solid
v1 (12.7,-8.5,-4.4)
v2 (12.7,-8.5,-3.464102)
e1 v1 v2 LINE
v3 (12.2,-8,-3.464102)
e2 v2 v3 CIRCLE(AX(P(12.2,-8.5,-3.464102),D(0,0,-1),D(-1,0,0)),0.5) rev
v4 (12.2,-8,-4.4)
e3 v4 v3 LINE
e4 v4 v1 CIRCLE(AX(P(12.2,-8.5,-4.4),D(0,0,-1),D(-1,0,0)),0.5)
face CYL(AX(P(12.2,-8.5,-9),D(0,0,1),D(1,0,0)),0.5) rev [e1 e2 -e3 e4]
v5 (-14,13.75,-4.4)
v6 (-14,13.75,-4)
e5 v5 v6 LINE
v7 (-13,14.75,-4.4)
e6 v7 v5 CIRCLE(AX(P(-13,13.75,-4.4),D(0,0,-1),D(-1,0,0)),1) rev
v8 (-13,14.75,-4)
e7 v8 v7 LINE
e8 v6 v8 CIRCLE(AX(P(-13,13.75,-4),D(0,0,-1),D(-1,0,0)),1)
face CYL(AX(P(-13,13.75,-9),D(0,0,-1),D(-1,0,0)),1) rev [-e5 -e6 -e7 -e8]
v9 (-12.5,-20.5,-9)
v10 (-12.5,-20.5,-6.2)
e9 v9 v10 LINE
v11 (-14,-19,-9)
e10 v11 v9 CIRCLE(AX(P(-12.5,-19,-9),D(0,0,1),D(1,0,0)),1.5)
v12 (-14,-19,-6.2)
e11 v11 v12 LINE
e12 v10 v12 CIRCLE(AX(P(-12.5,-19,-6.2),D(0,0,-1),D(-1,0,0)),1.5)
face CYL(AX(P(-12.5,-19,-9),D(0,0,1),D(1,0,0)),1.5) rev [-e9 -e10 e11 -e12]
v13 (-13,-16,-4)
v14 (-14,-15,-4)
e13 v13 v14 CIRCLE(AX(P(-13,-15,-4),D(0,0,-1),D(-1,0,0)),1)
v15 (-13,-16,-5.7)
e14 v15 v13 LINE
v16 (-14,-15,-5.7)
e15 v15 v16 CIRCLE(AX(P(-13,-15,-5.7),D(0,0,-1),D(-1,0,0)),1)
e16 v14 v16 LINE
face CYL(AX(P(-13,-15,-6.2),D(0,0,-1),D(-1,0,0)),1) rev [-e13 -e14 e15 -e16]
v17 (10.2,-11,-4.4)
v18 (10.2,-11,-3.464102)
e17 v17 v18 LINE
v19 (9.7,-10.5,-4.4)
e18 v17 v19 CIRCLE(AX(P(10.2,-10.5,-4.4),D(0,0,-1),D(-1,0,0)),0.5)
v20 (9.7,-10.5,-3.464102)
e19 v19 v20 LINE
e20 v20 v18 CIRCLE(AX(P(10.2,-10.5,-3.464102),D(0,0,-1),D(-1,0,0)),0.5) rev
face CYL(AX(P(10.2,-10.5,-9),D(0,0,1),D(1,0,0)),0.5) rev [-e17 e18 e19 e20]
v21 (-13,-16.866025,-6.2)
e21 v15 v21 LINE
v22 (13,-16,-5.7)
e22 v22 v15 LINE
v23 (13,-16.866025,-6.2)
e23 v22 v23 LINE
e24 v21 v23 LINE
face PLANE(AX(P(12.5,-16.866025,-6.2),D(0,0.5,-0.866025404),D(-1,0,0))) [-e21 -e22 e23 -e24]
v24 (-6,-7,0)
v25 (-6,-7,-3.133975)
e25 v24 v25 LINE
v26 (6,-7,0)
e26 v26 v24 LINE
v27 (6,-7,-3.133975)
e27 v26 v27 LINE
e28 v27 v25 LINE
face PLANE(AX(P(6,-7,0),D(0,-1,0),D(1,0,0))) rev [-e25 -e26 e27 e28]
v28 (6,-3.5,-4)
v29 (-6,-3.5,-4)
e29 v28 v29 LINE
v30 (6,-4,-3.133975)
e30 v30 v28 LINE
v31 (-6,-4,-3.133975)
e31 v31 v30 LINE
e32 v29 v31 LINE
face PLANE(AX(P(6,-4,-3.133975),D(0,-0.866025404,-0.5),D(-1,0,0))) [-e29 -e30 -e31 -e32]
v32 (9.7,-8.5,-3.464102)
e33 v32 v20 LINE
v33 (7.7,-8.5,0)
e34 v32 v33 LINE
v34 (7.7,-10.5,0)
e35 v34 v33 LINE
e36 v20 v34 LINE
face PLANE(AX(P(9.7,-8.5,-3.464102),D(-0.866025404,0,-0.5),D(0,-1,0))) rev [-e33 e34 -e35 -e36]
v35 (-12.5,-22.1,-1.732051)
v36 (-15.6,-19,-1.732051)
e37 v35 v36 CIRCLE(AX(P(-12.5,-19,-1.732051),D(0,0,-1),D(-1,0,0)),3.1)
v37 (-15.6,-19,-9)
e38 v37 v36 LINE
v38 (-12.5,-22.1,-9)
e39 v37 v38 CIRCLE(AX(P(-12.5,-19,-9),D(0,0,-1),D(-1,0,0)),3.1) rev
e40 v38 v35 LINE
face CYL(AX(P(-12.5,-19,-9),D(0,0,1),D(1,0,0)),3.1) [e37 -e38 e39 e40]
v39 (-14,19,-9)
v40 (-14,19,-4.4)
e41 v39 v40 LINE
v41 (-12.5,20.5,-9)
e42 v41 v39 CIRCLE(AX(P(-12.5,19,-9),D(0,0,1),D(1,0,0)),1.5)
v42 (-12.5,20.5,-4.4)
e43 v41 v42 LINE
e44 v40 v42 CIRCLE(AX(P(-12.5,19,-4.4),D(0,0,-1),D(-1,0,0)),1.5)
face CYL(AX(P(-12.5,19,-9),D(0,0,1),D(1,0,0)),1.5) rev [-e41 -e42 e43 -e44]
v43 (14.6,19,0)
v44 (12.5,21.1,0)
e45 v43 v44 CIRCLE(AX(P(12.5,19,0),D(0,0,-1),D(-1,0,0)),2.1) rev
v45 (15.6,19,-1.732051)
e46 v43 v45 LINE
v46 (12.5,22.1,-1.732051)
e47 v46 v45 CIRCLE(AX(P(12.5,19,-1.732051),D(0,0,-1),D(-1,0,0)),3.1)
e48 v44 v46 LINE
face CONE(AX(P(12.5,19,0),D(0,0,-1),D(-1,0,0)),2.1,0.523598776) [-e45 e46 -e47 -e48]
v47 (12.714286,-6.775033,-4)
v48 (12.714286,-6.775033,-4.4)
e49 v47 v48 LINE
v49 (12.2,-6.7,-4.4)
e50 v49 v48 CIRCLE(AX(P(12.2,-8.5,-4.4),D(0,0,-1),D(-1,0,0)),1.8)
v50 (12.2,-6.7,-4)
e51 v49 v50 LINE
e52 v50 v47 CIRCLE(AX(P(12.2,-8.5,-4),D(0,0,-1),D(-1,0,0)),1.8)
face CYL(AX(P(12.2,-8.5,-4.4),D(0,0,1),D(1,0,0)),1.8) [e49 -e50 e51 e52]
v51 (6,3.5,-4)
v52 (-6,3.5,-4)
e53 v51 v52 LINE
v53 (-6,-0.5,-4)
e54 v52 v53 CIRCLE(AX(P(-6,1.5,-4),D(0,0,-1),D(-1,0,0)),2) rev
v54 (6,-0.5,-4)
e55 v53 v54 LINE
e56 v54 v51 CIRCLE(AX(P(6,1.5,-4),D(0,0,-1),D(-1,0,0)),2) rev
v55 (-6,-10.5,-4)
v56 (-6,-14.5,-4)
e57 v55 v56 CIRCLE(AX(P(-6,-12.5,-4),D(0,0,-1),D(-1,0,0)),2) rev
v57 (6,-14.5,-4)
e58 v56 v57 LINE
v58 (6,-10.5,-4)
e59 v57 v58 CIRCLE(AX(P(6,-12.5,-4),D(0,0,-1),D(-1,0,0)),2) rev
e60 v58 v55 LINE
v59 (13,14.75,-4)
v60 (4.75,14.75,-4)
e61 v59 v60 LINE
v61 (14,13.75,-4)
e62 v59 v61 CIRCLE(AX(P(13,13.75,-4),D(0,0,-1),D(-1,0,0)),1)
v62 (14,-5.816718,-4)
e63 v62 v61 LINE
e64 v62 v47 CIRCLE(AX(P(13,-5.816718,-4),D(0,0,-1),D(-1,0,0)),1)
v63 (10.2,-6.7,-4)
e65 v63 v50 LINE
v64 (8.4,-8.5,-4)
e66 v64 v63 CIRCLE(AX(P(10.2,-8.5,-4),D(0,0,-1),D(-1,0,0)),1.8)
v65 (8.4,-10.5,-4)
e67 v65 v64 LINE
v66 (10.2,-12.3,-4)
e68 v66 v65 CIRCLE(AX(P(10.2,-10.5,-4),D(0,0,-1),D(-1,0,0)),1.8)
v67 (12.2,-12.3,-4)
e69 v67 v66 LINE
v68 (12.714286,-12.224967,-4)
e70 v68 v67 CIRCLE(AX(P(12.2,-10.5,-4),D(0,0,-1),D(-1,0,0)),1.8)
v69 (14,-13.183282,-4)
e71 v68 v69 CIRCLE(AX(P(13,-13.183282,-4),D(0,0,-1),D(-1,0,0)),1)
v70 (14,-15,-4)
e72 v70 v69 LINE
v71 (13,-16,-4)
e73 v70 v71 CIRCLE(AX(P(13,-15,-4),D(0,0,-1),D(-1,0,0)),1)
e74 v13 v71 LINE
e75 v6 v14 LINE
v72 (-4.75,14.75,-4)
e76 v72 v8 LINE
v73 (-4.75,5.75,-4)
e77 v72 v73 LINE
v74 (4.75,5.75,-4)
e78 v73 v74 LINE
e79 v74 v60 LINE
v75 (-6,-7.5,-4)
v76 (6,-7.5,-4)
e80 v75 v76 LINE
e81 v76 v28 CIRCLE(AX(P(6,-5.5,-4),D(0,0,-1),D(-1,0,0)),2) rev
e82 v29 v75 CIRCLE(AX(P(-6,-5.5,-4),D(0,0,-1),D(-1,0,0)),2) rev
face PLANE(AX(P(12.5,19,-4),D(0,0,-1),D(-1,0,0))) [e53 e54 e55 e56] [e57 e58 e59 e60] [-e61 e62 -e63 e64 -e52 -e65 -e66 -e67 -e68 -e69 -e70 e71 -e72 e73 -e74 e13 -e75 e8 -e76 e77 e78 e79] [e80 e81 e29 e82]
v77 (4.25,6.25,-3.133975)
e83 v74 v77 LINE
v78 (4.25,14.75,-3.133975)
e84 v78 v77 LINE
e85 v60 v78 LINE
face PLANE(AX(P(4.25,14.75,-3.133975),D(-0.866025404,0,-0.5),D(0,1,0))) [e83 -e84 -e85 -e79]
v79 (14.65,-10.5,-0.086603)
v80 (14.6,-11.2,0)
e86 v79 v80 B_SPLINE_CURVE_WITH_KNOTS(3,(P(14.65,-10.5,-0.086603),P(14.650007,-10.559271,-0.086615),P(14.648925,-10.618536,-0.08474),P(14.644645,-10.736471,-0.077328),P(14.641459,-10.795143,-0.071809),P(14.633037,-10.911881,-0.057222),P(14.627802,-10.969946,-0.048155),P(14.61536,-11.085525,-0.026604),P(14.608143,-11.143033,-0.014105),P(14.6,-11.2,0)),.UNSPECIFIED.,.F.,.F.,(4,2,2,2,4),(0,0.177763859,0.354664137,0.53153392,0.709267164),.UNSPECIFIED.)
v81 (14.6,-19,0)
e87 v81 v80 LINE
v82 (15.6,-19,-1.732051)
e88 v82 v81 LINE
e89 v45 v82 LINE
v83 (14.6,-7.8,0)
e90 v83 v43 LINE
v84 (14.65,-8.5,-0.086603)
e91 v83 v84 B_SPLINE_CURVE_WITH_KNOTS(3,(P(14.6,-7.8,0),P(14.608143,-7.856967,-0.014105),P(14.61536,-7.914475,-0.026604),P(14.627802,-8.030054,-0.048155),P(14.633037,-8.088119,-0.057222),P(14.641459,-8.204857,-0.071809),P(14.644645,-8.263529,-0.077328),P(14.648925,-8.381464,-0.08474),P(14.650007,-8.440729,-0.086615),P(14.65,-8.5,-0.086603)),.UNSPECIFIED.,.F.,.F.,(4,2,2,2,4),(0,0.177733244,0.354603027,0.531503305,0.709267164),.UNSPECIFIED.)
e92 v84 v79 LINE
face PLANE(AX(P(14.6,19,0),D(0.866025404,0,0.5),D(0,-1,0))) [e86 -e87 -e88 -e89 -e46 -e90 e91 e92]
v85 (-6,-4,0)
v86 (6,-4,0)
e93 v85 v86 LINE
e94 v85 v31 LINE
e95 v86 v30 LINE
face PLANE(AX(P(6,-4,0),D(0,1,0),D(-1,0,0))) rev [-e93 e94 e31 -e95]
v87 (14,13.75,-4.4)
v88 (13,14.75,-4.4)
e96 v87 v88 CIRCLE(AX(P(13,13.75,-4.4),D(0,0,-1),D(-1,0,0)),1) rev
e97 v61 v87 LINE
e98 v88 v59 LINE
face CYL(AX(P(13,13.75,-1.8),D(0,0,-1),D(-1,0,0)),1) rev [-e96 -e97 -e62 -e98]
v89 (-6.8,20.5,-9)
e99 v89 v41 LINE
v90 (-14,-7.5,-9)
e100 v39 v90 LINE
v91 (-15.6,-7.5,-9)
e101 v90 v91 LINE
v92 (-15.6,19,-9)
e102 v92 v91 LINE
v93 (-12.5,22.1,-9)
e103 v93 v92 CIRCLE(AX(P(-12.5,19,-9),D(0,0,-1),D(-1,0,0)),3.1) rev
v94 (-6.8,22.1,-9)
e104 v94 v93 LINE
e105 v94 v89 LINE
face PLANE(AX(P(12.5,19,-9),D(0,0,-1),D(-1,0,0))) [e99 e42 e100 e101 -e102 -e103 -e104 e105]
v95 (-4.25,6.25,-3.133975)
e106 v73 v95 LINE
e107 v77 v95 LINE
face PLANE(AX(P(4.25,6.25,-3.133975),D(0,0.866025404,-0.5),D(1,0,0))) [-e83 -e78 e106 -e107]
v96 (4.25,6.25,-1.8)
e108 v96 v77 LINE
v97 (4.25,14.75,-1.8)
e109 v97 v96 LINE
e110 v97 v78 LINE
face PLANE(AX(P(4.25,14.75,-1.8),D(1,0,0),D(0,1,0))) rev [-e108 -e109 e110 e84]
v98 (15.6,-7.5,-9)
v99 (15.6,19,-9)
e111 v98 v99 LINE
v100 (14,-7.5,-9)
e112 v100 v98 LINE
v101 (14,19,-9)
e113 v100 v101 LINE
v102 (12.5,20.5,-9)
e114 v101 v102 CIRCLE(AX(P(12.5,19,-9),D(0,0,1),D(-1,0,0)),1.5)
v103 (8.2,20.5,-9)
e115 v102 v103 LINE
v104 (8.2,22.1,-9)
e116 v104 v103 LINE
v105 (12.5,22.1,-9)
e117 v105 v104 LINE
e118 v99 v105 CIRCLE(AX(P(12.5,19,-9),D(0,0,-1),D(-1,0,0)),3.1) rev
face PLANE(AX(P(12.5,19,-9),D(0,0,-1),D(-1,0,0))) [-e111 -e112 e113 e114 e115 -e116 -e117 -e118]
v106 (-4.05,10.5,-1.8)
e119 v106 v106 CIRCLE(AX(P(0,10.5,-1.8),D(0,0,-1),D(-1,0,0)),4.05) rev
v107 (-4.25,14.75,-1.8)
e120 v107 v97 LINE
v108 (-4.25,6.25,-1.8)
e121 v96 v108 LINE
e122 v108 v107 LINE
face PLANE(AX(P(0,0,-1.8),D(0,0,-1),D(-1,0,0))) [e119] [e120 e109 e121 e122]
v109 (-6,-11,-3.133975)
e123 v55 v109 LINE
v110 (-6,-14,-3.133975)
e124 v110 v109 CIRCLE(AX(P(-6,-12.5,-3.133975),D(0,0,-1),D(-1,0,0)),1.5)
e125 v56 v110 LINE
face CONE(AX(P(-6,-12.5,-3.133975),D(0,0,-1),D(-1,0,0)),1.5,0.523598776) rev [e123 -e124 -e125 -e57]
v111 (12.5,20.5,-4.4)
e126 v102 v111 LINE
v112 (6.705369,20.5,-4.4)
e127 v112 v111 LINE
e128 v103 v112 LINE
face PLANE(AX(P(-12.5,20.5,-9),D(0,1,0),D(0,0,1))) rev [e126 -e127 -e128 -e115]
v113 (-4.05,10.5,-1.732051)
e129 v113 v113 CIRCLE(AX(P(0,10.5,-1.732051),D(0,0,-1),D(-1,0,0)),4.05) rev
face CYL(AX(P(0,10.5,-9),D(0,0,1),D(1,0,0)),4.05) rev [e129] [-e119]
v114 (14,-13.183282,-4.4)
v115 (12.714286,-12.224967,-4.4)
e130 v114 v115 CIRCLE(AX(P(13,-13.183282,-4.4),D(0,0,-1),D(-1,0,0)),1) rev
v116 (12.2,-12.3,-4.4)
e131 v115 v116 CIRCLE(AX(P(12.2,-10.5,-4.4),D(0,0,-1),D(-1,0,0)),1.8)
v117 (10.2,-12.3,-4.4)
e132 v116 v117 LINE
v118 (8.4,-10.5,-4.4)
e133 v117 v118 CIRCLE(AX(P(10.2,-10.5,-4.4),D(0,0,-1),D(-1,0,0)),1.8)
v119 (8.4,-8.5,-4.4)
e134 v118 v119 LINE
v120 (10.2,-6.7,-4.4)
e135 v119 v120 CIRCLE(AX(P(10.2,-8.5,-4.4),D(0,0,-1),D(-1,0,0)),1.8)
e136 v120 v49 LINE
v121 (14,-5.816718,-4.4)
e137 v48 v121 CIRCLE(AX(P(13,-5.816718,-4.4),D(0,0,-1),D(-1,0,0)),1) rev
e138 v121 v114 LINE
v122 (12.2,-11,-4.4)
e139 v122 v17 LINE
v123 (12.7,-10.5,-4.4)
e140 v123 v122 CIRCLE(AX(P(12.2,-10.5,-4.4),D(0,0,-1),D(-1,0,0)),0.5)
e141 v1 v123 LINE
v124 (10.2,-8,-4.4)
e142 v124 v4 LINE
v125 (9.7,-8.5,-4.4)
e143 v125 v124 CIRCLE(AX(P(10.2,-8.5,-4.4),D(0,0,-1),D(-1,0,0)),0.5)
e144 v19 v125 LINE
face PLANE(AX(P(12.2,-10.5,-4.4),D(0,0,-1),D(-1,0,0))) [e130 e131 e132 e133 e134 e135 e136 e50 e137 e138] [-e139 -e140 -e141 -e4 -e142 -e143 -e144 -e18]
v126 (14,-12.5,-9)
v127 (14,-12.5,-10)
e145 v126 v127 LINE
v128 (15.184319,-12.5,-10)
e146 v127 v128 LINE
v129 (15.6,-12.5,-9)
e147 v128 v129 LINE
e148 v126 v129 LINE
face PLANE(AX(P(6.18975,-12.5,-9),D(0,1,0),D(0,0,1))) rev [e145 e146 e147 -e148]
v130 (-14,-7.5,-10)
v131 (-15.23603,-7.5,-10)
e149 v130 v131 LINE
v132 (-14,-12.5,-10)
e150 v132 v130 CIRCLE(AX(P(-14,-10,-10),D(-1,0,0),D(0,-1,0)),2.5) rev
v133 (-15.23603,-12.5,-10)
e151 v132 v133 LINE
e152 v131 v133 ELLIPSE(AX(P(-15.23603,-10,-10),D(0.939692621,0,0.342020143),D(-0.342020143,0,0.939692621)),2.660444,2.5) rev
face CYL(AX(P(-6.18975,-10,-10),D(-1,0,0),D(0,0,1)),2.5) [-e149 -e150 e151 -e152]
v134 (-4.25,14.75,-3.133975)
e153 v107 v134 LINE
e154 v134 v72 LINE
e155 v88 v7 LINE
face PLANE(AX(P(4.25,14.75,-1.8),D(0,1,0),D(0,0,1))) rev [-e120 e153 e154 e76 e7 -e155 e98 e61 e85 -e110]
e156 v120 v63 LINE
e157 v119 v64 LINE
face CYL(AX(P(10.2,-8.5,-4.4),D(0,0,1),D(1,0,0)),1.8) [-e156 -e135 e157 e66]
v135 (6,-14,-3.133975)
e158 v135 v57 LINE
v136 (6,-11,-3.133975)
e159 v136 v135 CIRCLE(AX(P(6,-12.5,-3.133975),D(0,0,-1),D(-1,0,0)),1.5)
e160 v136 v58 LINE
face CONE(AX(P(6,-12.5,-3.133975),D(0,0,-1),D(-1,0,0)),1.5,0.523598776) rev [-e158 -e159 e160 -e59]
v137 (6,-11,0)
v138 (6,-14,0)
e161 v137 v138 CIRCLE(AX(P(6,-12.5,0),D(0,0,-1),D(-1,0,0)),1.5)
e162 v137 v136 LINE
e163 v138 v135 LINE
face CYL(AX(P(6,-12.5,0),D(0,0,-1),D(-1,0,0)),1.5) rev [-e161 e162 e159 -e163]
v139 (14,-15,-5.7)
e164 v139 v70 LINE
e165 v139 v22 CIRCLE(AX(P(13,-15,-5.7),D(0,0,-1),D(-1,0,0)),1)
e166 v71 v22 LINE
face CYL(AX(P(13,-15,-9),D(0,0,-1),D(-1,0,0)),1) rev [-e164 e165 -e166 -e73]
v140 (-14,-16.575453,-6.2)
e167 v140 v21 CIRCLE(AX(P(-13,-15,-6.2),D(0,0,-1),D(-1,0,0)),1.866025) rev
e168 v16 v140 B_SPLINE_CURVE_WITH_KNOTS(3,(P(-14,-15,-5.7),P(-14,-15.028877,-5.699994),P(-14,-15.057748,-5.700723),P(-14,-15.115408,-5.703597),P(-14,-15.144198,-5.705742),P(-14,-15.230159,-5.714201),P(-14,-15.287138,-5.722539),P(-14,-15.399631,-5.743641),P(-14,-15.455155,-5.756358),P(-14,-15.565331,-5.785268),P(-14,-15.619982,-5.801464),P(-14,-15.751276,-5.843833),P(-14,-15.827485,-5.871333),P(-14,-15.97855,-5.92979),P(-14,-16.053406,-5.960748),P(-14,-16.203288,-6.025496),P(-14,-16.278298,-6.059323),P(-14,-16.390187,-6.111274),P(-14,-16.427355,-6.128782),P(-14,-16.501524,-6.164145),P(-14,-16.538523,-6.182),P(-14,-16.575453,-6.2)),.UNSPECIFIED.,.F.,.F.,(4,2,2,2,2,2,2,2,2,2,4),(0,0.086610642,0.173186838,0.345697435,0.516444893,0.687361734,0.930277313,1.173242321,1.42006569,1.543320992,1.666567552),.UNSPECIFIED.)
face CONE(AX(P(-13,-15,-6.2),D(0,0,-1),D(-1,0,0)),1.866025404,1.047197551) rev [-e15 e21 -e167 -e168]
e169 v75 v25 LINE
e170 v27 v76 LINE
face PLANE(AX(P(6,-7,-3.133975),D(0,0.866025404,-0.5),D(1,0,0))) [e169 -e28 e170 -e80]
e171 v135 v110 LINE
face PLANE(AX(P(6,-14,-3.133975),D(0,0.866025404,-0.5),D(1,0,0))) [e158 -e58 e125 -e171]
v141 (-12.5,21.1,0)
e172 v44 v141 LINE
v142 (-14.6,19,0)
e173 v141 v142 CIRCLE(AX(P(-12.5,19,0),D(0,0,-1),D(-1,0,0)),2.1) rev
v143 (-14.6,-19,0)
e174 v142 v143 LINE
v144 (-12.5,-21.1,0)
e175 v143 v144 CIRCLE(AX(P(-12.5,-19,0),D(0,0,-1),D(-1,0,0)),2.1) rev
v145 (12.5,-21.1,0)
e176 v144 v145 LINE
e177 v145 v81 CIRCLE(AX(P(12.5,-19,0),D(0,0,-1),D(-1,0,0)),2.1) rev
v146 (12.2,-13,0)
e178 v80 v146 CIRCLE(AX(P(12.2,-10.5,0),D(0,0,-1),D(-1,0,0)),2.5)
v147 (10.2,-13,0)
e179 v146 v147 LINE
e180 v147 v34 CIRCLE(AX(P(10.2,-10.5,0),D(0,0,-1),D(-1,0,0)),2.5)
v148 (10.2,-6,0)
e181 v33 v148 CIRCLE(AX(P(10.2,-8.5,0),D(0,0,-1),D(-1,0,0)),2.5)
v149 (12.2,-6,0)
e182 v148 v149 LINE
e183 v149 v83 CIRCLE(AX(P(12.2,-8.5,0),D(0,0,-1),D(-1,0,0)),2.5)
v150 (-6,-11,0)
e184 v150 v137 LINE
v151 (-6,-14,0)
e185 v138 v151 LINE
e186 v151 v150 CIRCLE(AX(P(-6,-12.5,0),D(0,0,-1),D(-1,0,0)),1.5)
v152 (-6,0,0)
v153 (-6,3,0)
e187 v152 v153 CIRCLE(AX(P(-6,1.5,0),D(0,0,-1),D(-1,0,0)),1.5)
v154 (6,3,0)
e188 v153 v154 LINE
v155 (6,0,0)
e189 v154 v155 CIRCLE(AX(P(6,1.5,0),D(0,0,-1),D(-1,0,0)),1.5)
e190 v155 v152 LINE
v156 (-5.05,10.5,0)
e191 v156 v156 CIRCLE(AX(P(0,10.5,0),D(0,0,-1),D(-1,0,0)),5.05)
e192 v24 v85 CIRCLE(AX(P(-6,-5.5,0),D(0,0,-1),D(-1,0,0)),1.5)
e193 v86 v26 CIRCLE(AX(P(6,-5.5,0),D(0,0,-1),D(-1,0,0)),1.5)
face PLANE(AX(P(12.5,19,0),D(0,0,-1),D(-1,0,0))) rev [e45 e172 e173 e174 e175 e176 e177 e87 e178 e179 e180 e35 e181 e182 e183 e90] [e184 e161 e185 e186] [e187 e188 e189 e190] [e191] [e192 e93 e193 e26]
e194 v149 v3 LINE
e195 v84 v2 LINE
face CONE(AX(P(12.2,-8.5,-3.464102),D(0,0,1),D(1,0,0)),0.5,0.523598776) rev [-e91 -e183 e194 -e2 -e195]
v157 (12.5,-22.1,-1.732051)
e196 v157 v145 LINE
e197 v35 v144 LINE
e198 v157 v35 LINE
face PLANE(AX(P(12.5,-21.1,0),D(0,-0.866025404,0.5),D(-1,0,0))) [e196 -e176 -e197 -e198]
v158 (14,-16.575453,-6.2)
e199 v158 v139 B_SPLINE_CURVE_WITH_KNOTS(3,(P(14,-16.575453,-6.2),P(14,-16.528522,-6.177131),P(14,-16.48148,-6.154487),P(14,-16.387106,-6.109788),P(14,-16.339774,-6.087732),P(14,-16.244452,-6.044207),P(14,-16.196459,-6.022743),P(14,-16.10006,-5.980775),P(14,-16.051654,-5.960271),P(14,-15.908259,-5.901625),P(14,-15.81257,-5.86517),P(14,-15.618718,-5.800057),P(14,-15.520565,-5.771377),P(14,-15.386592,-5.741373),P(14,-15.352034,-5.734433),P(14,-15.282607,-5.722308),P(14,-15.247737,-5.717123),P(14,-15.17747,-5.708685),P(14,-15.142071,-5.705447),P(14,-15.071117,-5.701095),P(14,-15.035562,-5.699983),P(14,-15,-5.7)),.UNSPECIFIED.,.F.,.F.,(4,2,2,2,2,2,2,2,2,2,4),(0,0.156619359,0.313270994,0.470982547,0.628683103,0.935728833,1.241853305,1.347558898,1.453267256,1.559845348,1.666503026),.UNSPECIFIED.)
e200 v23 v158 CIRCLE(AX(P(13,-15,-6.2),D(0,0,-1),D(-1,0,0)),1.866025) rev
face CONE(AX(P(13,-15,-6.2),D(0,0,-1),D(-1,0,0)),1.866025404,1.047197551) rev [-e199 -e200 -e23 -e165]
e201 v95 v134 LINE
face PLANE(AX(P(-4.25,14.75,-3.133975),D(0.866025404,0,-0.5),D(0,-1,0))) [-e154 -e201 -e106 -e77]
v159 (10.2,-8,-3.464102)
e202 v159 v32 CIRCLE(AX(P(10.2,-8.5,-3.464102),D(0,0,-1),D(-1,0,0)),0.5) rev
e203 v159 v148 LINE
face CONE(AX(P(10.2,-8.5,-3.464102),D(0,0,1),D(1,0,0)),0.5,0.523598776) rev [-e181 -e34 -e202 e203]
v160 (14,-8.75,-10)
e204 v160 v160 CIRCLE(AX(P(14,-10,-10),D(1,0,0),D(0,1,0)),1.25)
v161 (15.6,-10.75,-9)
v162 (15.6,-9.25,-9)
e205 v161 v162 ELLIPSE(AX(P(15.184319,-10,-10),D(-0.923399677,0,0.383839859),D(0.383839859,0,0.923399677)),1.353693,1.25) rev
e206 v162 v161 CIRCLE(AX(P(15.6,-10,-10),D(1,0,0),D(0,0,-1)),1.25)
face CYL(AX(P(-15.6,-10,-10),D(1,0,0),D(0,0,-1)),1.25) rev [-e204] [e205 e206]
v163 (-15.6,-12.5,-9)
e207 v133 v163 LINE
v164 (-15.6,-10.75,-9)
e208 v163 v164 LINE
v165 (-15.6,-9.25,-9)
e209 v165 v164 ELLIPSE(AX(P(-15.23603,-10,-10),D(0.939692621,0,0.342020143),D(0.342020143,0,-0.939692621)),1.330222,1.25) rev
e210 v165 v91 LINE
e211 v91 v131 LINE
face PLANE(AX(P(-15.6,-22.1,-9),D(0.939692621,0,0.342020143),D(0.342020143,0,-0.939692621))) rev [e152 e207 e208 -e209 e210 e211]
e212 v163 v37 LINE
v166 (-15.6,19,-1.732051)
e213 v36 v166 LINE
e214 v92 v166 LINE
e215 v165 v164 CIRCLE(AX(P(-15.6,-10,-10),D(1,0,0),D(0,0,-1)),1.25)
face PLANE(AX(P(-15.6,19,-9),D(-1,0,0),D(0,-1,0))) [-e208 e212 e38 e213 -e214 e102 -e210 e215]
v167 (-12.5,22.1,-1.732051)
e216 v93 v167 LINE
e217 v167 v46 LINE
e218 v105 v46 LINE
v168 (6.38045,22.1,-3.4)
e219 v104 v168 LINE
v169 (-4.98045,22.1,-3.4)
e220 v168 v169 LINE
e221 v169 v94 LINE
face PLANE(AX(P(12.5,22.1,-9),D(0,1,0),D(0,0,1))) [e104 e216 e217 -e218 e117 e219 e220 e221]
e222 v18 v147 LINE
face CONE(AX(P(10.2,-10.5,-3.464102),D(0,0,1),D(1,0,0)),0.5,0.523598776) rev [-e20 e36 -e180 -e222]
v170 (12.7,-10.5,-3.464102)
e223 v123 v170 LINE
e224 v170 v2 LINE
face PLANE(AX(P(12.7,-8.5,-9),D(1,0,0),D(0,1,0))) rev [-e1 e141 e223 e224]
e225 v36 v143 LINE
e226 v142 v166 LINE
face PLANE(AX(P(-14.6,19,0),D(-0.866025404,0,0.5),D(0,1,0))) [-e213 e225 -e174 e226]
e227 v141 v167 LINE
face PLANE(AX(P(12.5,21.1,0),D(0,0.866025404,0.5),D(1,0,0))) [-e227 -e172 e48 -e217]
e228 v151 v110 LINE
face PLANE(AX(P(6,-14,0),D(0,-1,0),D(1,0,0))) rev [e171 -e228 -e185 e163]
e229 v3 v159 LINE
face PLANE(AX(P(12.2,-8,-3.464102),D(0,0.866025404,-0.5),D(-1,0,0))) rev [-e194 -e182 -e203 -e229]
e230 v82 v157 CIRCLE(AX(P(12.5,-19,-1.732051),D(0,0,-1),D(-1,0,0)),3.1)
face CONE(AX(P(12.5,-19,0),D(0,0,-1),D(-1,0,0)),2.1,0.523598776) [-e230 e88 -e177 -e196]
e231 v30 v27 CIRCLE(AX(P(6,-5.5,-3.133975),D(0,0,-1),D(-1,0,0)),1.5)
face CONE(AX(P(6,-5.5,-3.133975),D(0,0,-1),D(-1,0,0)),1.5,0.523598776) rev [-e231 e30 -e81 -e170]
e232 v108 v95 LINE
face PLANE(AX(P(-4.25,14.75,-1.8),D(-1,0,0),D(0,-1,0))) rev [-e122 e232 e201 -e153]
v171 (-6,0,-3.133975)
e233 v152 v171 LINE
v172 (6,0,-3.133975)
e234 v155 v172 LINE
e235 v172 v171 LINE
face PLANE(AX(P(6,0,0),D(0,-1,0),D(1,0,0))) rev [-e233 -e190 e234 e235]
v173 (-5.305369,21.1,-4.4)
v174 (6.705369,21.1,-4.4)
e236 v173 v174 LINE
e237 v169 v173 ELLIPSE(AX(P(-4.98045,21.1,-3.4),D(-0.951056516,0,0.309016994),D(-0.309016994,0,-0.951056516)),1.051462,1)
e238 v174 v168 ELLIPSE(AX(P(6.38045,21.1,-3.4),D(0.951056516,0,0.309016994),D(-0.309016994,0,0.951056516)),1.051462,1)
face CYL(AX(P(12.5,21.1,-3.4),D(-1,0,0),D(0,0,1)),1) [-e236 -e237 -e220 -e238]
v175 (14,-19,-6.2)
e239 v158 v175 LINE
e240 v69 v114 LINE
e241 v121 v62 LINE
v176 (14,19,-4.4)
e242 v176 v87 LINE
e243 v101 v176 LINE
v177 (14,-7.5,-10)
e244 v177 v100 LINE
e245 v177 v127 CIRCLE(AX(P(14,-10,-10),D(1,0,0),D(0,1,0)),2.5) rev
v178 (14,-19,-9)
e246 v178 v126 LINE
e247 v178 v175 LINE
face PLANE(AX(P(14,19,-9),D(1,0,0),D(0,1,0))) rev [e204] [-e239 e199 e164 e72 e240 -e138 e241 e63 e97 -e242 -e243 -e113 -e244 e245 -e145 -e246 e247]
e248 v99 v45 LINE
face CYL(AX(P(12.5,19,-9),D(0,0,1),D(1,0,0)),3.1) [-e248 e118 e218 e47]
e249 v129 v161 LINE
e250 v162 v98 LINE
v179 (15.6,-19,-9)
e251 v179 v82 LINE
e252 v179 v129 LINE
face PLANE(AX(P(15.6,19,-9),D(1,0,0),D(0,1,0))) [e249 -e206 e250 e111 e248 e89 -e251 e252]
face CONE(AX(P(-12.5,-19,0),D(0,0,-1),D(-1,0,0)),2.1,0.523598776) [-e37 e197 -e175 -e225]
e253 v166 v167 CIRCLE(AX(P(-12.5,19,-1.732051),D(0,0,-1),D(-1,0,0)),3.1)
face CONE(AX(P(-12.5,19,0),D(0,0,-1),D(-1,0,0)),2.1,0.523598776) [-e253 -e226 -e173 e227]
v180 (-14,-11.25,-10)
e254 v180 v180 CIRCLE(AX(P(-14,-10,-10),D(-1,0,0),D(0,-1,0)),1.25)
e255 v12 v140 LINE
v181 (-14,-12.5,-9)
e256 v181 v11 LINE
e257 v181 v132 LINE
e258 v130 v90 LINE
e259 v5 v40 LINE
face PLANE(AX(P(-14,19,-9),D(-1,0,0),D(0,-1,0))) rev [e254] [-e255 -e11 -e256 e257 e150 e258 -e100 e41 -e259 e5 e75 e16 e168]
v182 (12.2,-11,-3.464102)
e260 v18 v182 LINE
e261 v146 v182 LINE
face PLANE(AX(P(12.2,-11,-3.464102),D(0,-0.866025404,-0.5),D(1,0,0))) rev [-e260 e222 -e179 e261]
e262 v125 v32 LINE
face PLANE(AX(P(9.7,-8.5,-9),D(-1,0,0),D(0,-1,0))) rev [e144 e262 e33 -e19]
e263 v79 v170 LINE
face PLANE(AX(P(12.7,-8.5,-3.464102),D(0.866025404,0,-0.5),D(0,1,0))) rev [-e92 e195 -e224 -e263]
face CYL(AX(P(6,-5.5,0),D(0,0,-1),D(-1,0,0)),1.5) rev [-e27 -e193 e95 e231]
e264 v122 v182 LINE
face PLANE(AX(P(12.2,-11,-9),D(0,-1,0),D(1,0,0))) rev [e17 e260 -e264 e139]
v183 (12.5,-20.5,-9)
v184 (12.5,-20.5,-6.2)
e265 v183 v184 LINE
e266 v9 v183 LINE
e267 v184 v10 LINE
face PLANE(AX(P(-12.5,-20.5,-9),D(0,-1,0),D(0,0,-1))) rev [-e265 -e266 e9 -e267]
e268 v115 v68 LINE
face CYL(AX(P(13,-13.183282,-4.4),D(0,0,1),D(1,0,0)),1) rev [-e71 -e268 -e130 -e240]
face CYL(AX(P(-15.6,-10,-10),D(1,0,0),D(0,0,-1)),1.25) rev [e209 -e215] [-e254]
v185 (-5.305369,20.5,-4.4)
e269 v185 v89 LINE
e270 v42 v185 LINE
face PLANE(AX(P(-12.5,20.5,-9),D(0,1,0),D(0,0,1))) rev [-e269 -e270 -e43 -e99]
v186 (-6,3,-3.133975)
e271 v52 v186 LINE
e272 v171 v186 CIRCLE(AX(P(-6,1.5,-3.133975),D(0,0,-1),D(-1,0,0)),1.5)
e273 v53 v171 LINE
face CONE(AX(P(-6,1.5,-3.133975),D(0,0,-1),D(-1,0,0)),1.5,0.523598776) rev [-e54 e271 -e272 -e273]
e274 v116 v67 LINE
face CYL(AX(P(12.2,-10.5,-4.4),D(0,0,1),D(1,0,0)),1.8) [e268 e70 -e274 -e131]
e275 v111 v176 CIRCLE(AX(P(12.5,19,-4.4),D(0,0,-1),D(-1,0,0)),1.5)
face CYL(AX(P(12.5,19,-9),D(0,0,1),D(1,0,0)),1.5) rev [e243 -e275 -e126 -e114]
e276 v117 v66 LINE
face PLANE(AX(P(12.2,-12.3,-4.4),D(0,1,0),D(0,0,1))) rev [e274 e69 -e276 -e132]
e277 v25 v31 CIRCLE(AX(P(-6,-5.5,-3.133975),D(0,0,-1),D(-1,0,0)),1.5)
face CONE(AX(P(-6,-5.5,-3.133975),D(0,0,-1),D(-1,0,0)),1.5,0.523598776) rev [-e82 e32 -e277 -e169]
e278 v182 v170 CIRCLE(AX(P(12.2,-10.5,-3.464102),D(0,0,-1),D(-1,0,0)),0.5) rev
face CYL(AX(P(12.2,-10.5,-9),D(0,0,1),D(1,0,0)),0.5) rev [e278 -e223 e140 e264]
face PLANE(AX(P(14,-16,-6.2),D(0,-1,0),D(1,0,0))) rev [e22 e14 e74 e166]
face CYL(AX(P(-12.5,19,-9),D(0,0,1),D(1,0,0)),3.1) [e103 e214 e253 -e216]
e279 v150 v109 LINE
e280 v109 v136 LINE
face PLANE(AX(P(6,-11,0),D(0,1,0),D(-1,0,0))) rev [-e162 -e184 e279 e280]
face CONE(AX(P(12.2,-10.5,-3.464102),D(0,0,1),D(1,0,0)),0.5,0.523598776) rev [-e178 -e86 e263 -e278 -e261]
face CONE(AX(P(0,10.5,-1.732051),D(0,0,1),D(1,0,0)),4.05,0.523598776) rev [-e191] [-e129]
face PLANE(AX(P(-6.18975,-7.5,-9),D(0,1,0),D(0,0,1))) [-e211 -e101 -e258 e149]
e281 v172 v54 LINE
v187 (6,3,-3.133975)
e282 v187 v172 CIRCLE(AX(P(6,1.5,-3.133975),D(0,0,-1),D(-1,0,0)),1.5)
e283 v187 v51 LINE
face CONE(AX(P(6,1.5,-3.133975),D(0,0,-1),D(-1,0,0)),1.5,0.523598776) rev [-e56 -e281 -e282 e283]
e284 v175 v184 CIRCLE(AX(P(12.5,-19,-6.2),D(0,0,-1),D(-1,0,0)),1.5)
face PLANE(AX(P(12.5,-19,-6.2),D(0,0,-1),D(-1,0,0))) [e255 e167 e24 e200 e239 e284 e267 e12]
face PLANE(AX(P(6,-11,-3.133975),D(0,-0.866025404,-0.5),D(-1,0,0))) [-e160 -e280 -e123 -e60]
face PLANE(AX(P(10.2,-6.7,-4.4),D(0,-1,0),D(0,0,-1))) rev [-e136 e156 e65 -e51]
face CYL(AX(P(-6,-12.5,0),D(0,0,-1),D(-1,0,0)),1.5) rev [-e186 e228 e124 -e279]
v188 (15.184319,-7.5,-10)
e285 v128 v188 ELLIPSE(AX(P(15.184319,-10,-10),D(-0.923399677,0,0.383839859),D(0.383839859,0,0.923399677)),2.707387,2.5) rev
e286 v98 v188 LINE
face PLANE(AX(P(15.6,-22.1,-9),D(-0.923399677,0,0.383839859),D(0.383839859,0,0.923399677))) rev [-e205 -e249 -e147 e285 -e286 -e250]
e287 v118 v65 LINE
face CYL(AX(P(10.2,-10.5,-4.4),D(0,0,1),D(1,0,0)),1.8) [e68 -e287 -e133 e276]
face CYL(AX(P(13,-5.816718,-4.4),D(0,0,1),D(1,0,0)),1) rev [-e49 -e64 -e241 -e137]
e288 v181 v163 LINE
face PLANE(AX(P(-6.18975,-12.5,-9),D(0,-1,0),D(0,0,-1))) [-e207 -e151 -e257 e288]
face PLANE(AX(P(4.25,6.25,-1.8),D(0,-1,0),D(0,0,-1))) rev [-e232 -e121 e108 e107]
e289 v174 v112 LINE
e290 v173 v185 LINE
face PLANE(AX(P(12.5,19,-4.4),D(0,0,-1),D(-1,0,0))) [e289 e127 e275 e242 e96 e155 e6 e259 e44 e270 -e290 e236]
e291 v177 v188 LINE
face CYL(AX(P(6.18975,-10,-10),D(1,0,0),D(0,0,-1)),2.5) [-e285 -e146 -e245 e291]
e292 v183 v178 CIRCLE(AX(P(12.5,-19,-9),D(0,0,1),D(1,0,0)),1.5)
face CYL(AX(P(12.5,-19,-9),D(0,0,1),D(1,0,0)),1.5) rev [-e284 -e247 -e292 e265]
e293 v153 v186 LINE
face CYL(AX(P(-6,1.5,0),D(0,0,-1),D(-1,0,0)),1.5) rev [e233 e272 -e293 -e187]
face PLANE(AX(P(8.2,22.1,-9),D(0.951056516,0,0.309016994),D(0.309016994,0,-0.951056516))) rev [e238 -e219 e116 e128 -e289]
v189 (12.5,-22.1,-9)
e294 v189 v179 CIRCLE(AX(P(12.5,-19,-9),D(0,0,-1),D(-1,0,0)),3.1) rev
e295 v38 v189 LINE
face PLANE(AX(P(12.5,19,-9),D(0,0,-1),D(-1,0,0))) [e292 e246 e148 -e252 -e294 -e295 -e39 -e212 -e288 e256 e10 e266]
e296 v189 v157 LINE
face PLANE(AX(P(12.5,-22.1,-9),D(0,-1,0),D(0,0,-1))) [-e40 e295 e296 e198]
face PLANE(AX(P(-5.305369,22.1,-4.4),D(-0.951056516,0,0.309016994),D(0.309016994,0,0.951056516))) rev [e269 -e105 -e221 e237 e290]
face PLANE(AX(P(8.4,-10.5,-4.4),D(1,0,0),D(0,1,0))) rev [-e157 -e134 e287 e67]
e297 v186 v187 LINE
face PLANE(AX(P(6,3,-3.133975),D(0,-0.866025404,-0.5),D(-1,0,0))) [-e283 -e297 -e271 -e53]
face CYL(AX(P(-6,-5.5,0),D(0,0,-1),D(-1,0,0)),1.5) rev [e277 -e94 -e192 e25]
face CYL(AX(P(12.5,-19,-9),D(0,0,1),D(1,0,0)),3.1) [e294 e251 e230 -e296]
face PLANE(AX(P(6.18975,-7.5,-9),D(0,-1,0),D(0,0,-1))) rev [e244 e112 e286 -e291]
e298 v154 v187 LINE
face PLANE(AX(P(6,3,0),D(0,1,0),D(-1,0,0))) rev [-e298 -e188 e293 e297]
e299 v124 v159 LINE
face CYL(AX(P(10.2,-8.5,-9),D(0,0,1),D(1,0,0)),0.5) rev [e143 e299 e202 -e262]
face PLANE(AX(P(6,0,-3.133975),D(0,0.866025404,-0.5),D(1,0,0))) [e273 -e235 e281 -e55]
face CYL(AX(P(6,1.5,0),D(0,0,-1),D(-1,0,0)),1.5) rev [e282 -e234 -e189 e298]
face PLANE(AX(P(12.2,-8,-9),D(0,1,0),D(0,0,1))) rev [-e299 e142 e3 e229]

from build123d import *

# Parameters (mm, degrees)
BODY_DEPTH              = 4
SIDEWALLS_DEPTH         = 9
SKETCH2_R               = 4.05
CAMLENS_DEPTH           = 29.509121347
SKETCH3_W               = 8.5
SKETCH3_H               = 8.5
CAMBODY_DEPTH           = 2.2
BOARDSTOPTOP_DEPTH      = 0.4
BOARDSTOPBOTTOM_DEPTH   = 2.2
VENTS_DEPTH             = 28.509452921
FILLET1_START           = -6.2
FILLET1_DEPTH           = 3.2
FILLET1_START_2         = -4.4
FILLET1_2_DEPTH         = 1.4
CHAMFER1_SIZE           = 1
CHAMFER1_SIZE2          = 1.732050808
CHAMFER2_SIZE           = 2
CHAMFER2_SIZE_2         = 3.464101615
CHAMFER3_SIZE           = 0.5
CHAMFER3_SIZE_2         = 0.866025404
CUT_EXTRUDE3_DEPTH      = 47.250621617
FILLET2_R               = 1
ASSYLOCK1_START         = -15.6
ASSYLOCK1_DEPTH         = 1.6
ASSYLOCK2_START         = 14
ASSYLOCK2_DEPTH         = 1.6
CUT_EXTRUDE4_DEPTH      = 30.799664428
CUT_EXTRUDE4_DEPTH_BACK = 30.799664428
SKETCH8_R               = 1.25
CUT_EXTRUDE5_DEPTH      = 30.799664428


with BuildPart() as part:
    # Sketch1 → Body (new body)
    with BuildSketch(Plane.XY):
        with BuildLine():
            Line((-12.5, 20.5), (12.5, 20.5))
            ThreePointArc((12.5, 20.5), (13.560660172, 20.060660172), (14, 19))
            Line((14, 19), (14, -19))
            ThreePointArc((14, -19), (13.560660172, -20.060660172), (12.5, -20.5))
            Line((12.5, -20.5), (-12.5, -20.5))
            ThreePointArc((-12.5, -20.5), (-13.560660172, -20.060660172), (-14, -19))
            Line((-14, -19), (-14, 19))
            ThreePointArc((-14, 19), (-13.560660172, 20.060660172), (-12.5, 20.5))
        make_face()
    extrude(amount=-BODY_DEPTH)

    # Sketch1<2> → SideWalls (add)
    with BuildSketch(Plane.XY):
        with BuildLine():
            Line((12.5, -22.1), (-12.5, -22.1))
            ThreePointArc((-12.5, -22.1), (-14.692031022, -21.192031022), (-15.6, -19))
            Line((-15.6, -19), (-15.6, 19))
            ThreePointArc((-15.6, 19), (-14.692031022, 21.192031022), (-12.5, 22.1))
            Line((-12.5, 22.1), (12.5, 22.1))
            ThreePointArc((12.5, 22.1), (14.692031022, 21.192031022), (15.6, 19))
            Line((15.6, 19), (15.6, -19))
            ThreePointArc((15.6, -19), (14.692031022, -21.192031022), (12.5, -22.1))
        make_face()
        with BuildLine():
            Line((12.5, -20.5), (-12.5, -20.5))
            ThreePointArc((-12.5, -20.5), (-13.560660172, -20.060660172), (-14, -19))
            Line((-14, -19), (-14, 19))
            ThreePointArc((-14, 19), (-13.560660172, 20.060660172), (-12.5, 20.5))
            Line((-12.5, 20.5), (12.5, 20.5))
            ThreePointArc((12.5, 20.5), (13.560660172, 20.060660172), (14, 19))
            Line((14, 19), (14, -19))
            ThreePointArc((14, -19), (13.560660172, -20.060660172), (12.5, -20.5))
        make_face(mode=Mode.SUBTRACT)
    extrude(amount=-SIDEWALLS_DEPTH)

    # Sketch2 → CamLens (cut, through all)
    with BuildSketch(Plane.XY):
        with Locations((0, 10.5)):
            Circle(SKETCH2_R)
        with BuildLine():
            Line((12.2, -8), (10.2, -8))
            ThreePointArc((10.2, -8), (9.846446609, -8.146446609), (9.7, -8.5))
            Line((9.7, -8.5), (9.7, -10.5))
            ThreePointArc((9.7, -10.5), (9.846446609, -10.853553391), (10.2, -11))
            Line((10.2, -11), (12.2, -11))
            ThreePointArc((12.2, -11), (12.553553391, -10.853553391), (12.7, -10.5))
            Line((12.7, -10.5), (12.7, -8.5))
            ThreePointArc((12.7, -8.5), (12.553553391, -8.146446609), (12.2, -8))
        make_face()
    extrude(amount=-CAMLENS_DEPTH, mode=Mode.SUBTRACT)

    # Sketch3 → CamBody (cut)
    with BuildSketch(Plane(origin=(0, 0, -4), x_dir=(-1, 0, 0), z_dir=(0, 0, -1))):
        with Locations((0, 10.5)):
            Rectangle(SKETCH3_W, SKETCH3_H)
    extrude(amount=-CAMBODY_DEPTH, mode=Mode.SUBTRACT)

    # Sketch4 → BoardStopTop (add)
    # profile 1 of 2: a face of its own
    with BuildSketch(Plane(origin=(0, 0, -4), x_dir=(-1, 0, 0), z_dir=(0, 0, -1))):
        with BuildLine():
            Line((-14, 14.75), (-14, 19))
            ThreePointArc((-14, 19), (-13.560660172, 20.060660172), (-12.5, 20.5))
            Line((-12.5, 20.5), (12.5, 20.5))
            ThreePointArc((12.5, 20.5), (13.560660172, 20.060660172), (14, 19))
            Line((14, 19), (14, 14.75))
            Line((14, 14.75), (-14, 14.75))
        make_face()
    # profile 2 of 2: a face of its own
    with BuildSketch(Plane(origin=(0, 0, -4), x_dir=(-1, 0, 0), z_dir=(0, 0, -1))):
        with BuildLine():
            Line((-12.2, -12.3), (-10.2, -12.3))
            ThreePointArc((-10.2, -12.3), (-8.927207794, -11.772792206), (-8.4, -10.5))
            Line((-8.4, -10.5), (-8.4, -8.5))
            ThreePointArc((-8.4, -8.5), (-8.927207794, -7.227207794), (-10.2, -6.7))
            Line((-10.2, -6.7), (-12.2, -6.7))
            ThreePointArc((-12.2, -6.7), (-13.472792206, -7.227207794), (-14, -8.5))
            Line((-14, -8.5), (-14, -10.5))
            ThreePointArc((-14, -10.5), (-13.472792206, -11.772792206), (-12.2, -12.3))
        make_face()
        with BuildLine():
            Line((-12.7, -8.5), (-12.7, -10.5))
            ThreePointArc((-12.7, -10.5), (-12.553553391, -10.853553391), (-12.2, -11))
            Line((-12.2, -11), (-10.2, -11))
            ThreePointArc((-10.2, -11), (-9.846446609, -10.853553391), (-9.7, -10.5))
            Line((-9.7, -10.5), (-9.7, -8.5))
            ThreePointArc((-9.7, -8.5), (-9.846446609, -8.146446609), (-10.2, -8))
            Line((-10.2, -8), (-12.2, -8))
            ThreePointArc((-12.2, -8), (-12.553553391, -8.146446609), (-12.7, -8.5))
        make_face(mode=Mode.SUBTRACT)
    extrude(amount=BOARDSTOPTOP_DEPTH)

    # Sketch5 → BoardStopBottom (add)
    with BuildSketch(Plane(origin=(0, 0, -4), x_dir=(-1, 0, 0), z_dir=(0, 0, -1))):
        with BuildLine():
            Line((12.5, -20.5), (-12.5, -20.5))
            ThreePointArc((-12.5, -20.5), (-13.560660172, -20.060660172), (-14, -19))
            Line((-14, -19), (-14, -16))
            Line((-14, -16), (14, -16))
            Line((14, -16), (14, -19))
            ThreePointArc((14, -19), (13.560660172, -20.060660172), (12.5, -20.5))
        make_face()
    extrude(amount=BOARDSTOPBOTTOM_DEPTH)

    # Sketch10 → Vents (cut, through all)
    with BuildSketch(Plane(origin=(0, 0, -4), x_dir=(-1, 0, 0), z_dir=(0, 0, -1))):
        with BuildLine():
            Line((-6, -4), (6, -4))
            ThreePointArc((6, -4), (7.5, -5.5), (6, -7))
            Line((6, -7), (-6, -7))
            ThreePointArc((-6, -7), (-7.5, -5.5), (-6, -4))
        make_face()
        with BuildLine():
            Line((-6, -11), (6, -11))
            ThreePointArc((6, -11), (7.5, -12.5), (6, -14))
            Line((6, -14), (-6, -14))
            ThreePointArc((-6, -14), (-7.5, -12.5), (-6, -11))
        make_face()
        with BuildLine():
            Line((-6, 3), (6, 3))
            ThreePointArc((6, 3), (7.5, 1.5), (6, 0))
            Line((6, 0), (-6, 0))
            ThreePointArc((-6, 0), (-7.5, 1.5), (-6, 3))
        make_face()
    extrude(amount=-VENTS_DEPTH, mode=Mode.SUBTRACT)

    # Fillet1: read off the stored shape, not the designer's step
    # Fillet1 outline → Fillet1 (add)
    with BuildSketch(Plane.XY.offset(FILLET1_START)):
        with BuildLine():
            Line((-14, -16), (-13, -16))
            ThreePointArc((-13, -16), (-13.707106781, -15.707106781), (-14, -15))
            Line((-14, -15), (-14, -16))
        make_face()
        with BuildLine():
            ThreePointArc((14, -15), (13.707106781, -15.707106781), (13, -16))
            Line((13, -16), (14, -16))
            Line((14, -16), (14, -15))
        make_face()
    extrude(amount=FILLET1_DEPTH)

    # Fillet1 2 outline → Fillet1 2 (add)
    with BuildSketch(Plane.XY.offset(FILLET1_START_2)):
        with BuildLine():
            Line((-14, 14.75), (-14, 13.75))
            ThreePointArc((-14, 13.75), (-13.707106781, 14.457106781), (-13, 14.75))
            Line((-13, 14.75), (-14, 14.75))
        make_face()
        with BuildLine():
            ThreePointArc((12.714285714, -12.224966725), (13.597614305, -12.381497847), (14, -13.183281573))
            Line((14, -13.183281573), (14, -10.5))
            ThreePointArc((14, -10.5), (13.643210706, -11.575705748), (12.714285714, -12.224966725))
        make_face()
        with BuildLine():
            Line((14, 14.75), (13, 14.75))
            ThreePointArc((13, 14.75), (13.707106781, 14.457106781), (14, 13.75))
            Line((14, 13.75), (14, 14.75))
        make_face()
        with BuildLine():
            ThreePointArc((12.714285714, -6.775033275), (13.643210706, -7.424294252), (14, -8.5))
            Line((14, -8.5), (14, -5.816718427))
            ThreePointArc((14, -5.816718427), (13.597614305, -6.618502153), (12.714285714, -6.775033275))
        make_face()
    extrude(amount=FILLET1_2_DEPTH)

    # Chamfer1
    chamfer1_edges = [part.edges().sort_by_distance(p)[0] for p in [
        (14.692031022, 21.192031022, 0),
        (0, 22.1, 0),
        (-14.692031022, 21.192031022, 0),
        (-15.6, 0, 0),
        (-14.692031022, -21.192031022, 0),
        (0, -22.1, 0),
        (14.692031022, -21.192031022, 0),
        (15.6, 0, 0),
        (-4.05, 10.5, 0),
    ]]
    chamfer1_side = [part.faces().sort_by_distance(p)[0] for p in [
        (0, -21.558975047, 0),
    ]]
    chamfer(chamfer1_edges, length=CHAMFER1_SIZE, length2=CHAMFER1_SIZE2, reference=chamfer1_side[0])

    # Chamfer2
    # the kernel refuses this chamfer: 3.464101615, 2 mm, written as the material it takes off along each edge
    with BuildSketch(Plane(origin=(12.2, -10.5, 0), x_dir=(0, -1, 0), z_dir=(-1, 0, 0))) as chamfer2_piece_1:
        Polygon((0.5 + CHAMFER2_SIZE, 0), (0.5, -CHAMFER2_SIZE_2), (0.5, 0), align=None)
    revolve(axis=Axis((12.2, -10.5, 0), (0, 0, 1)), revolution_arc=90, mode=Mode.SUBTRACT)
    with BuildSketch(Plane(origin=(12.7, -10.5, 0), x_dir=(1, 0, 0), z_dir=(0, 1, 0)), Plane(origin=(12.2, -8, 0), x_dir=(0, 1, 0), z_dir=(-1, 0, 0)), Plane(origin=(9.7, -8.5, 0), x_dir=(-1, 0, 0), z_dir=(0, -1, 0)), Plane(origin=(10.2, -11, 0), x_dir=(0, -1, 0), z_dir=(1, 0, 0))) as chamfer2_piece_2:
        Polygon((CHAMFER2_SIZE, 0), (0, CHAMFER2_SIZE_2), (0, 0), align=None)
    extrude(amount=2, mode=Mode.SUBTRACT)
    with BuildSketch(Plane(origin=(12.2, -8.5, 0), x_dir=(1, 0, 0), z_dir=(0, -1, 0))) as chamfer2_piece_3:
        Polygon((0.5 + CHAMFER2_SIZE, 0), (0.5, -CHAMFER2_SIZE_2), (0.5, 0), align=None)
    revolve(axis=Axis((12.2, -8.5, 0), (0, 0, 1)), revolution_arc=90, mode=Mode.SUBTRACT)
    with BuildSketch(Plane(origin=(10.2, -8.5, 0), x_dir=(0, 1, 0), z_dir=(1, 0, 0))) as chamfer2_piece_4:
        Polygon((0.5 + CHAMFER2_SIZE, 0), (0.5, -CHAMFER2_SIZE_2), (0.5, 0), align=None)
    revolve(axis=Axis((10.2, -8.5, 0), (0, 0, 1)), revolution_arc=90, mode=Mode.SUBTRACT)
    with BuildSketch(Plane(origin=(10.2, -10.5, 0), x_dir=(-1, 0, 0), z_dir=(0, 1, 0))) as chamfer2_piece_5:
        Polygon((0.5 + CHAMFER2_SIZE, 0), (0.5, -CHAMFER2_SIZE_2), (0.5, 0), align=None)
    revolve(axis=Axis((10.2, -10.5, 0), (0, 0, 1)), revolution_arc=90, mode=Mode.SUBTRACT)

    # Chamfer3
    # the kernel refuses this chamfer: 0.866025404, 0.5 mm, written as the material it takes off along each edge
    with BuildSketch(Plane(origin=(-4.25, 14.75, -4), x_dir=(-1, 0, 0), z_dir=(0, -1, 0)), Plane(origin=(4.25, 6.25, -4), x_dir=(1, 0, 0), z_dir=(0, 1, 0)), Plane(origin=(-4.25, 6.25, -4), x_dir=(0, -1, 0), z_dir=(1, 0, 0))) as chamfer3_piece_1:
        Polygon((CHAMFER3_SIZE, 0), (0, -CHAMFER3_SIZE_2), (0, 0), align=None)
    extrude(amount=8.5, mode=Mode.SUBTRACT)
    with BuildSketch(Plane(origin=(6, 1.5, -4), x_dir=(0, -1, 0), z_dir=(-1, 0, 0))) as chamfer3_piece_2:
        Polygon((1.5, CHAMFER3_SIZE_2), (1.5 + CHAMFER3_SIZE, 0), (1.5, 0), align=None)
    revolve(axis=Axis((6, 1.5, -4), (0, 0, 1)), revolution_arc=180, mode=Mode.SUBTRACT)
    with BuildSketch(Plane(origin=(-6, 0, -4), x_dir=(0, 0, 1), z_dir=(1, 0, 0)), Plane(origin=(6, 3, -4), x_dir=(0, 0, 1), z_dir=(-1, 0, 0)), Plane(origin=(-6, -14, -4), x_dir=(0, 0, 1), z_dir=(1, 0, 0)), Plane(origin=(6, -11, -4), x_dir=(0, 0, 1), z_dir=(-1, 0, 0)), Plane(origin=(-6, -7, -4), x_dir=(0, 0, 1), z_dir=(1, 0, 0)), Plane(origin=(6, -4, -4), x_dir=(0, 0, 1), z_dir=(-1, 0, 0))) as chamfer3_piece_3:
        Polygon((CHAMFER3_SIZE_2, 0), (0, CHAMFER3_SIZE), (0, 0), align=None)
    extrude(amount=12, mode=Mode.SUBTRACT)
    with BuildSketch(Plane(origin=(-6, 1.5, -4), x_dir=(0, 1, 0), z_dir=(1, 0, 0))) as chamfer3_piece_4:
        Polygon((1.5, CHAMFER3_SIZE_2), (1.5 + CHAMFER3_SIZE, 0), (1.5, 0), align=None)
    revolve(axis=Axis((-6, 1.5, -4), (0, 0, 1)), revolution_arc=180, mode=Mode.SUBTRACT)
    with BuildSketch(Plane(origin=(6, -12.5, -4), x_dir=(0, -1, 0), z_dir=(-1, 0, 0))) as chamfer3_piece_5:
        Polygon((1.5, CHAMFER3_SIZE_2), (1.5 + CHAMFER3_SIZE, 0), (1.5, 0), align=None)
    revolve(axis=Axis((6, -12.5, -4), (0, 0, 1)), revolution_arc=180, mode=Mode.SUBTRACT)
    with BuildSketch(Plane(origin=(-6, -12.5, -4), x_dir=(0, 1, 0), z_dir=(1, 0, 0))) as chamfer3_piece_6:
        Polygon((1.5, CHAMFER3_SIZE_2), (1.5 + CHAMFER3_SIZE, 0), (1.5, 0), align=None)
    revolve(axis=Axis((-6, -12.5, -4), (0, 0, 1)), revolution_arc=180, mode=Mode.SUBTRACT)
    with BuildSketch(Plane(origin=(6, -5.5, -4), x_dir=(0, -1, 0), z_dir=(-1, 0, 0))) as chamfer3_piece_7:
        Polygon((1.5, CHAMFER3_SIZE_2), (1.5 + CHAMFER3_SIZE, 0), (1.5, 0), align=None)
    revolve(axis=Axis((6, -5.5, -4), (0, 0, 1)), revolution_arc=180, mode=Mode.SUBTRACT)
    with BuildSketch(Plane(origin=(-6, -5.5, -4), x_dir=(0, 1, 0), z_dir=(1, 0, 0))) as chamfer3_piece_8:
        Polygon((1.5, CHAMFER3_SIZE_2), (1.5 + CHAMFER3_SIZE, 0), (1.5, 0), align=None)
    revolve(axis=Axis((-6, -5.5, -4), (0, 0, 1)), revolution_arc=180, mode=Mode.SUBTRACT)
    with BuildSketch(Plane(origin=(13, -16, -6.2), x_dir=(0, 0, 1), z_dir=(-1, 0, 0))) as chamfer3_piece_9:
        Polygon((CHAMFER3_SIZE, 0), (0, -CHAMFER3_SIZE_2), (0, 0), align=None)
    extrude(amount=26, mode=Mode.SUBTRACT)
    with BuildSketch(Plane(origin=(-12.999999999, -14.999999999, -6.2), x_dir=(-6.36912744361302e-10, -1.0, 0), z_dir=(1.0, -6.36912744361302e-10, 0))) as chamfer3_piece_10_section:
        Polygon((1.000000001, -CHAMFER3_SIZE), (1.000000001 + CHAMFER3_SIZE_2, 0), (1.000000001, 0), align=None)
    chamfer3_piece_10 = revolve(axis=Axis((-12.999999999, -14.999999999, -6.2), (0, 0, -1)), revolution_arc=218.421729018, mode=Mode.PRIVATE)
    chamfer3_piece_10 = split(chamfer3_piece_10, bisect_by=Plane(origin=(-14, -14.999999999, -6.2), z_dir=(1, 0, 0)), keep=Keep.TOP, mode=Mode.PRIVATE)
    add(chamfer3_piece_10, mode=Mode.SUBTRACT)
    with BuildSketch(Plane(origin=(12.999999999, -14.999999999, -6.2), x_dir=(-0.621444946291684, 0.7834578346845006, 0), z_dir=(-0.7834578346845006, -0.621444946291684, 0))) as chamfer3_piece_11_section:
        Polygon((1.000000001, -CHAMFER3_SIZE), (1.000000001 + CHAMFER3_SIZE_2, 0), (1.000000001, 0), align=None)
    chamfer3_piece_11 = revolve(axis=Axis((12.999999999, -14.999999999, -6.2), (0, 0, -1)), revolution_arc=218.421729018, mode=Mode.PRIVATE)
    chamfer3_piece_11 = split(chamfer3_piece_11, bisect_by=Plane(origin=(14, -14.999999999, -6.2), z_dir=(-1, 0, 0)), keep=Keep.TOP, mode=Mode.PRIVATE)
    add(chamfer3_piece_11, mode=Mode.SUBTRACT)
    with BuildSketch(Plane(origin=(-6.490481985, 6.25, -4), x_dir=(0, -1, 0), z_dir=(1, 0, 0))) as chamfer3_piece_12a_section:
        Polygon((CHAMFER3_SIZE, 0), (0, -CHAMFER3_SIZE_2), (0, 0), align=None)
    chamfer3_piece_12a = extrude(amount=10.740481985, mode=Mode.PRIVATE)
    chamfer3_piece_12a = split(chamfer3_piece_12a, bisect_by=Plane(origin=(-4.25, 6.25, -4), z_dir=(-1, 0, 0)), keep=Keep.TOP, mode=Mode.PRIVATE)
    with BuildSketch(Plane(origin=(-4.25, 14.75, -4), x_dir=(-1, 0, 0), z_dir=(0, -1, 0))) as chamfer3_piece_12b_section:
        Polygon((CHAMFER3_SIZE, 0), (0, -CHAMFER3_SIZE_2), (0, 0), align=None)
    chamfer3_piece_12b = extrude(amount=10.740481985, mode=Mode.PRIVATE)
    chamfer3_piece_12b = split(chamfer3_piece_12b, bisect_by=Plane(origin=(-4.25, 6.25, -4), z_dir=(0, -1, 0)), keep=Keep.TOP, mode=Mode.PRIVATE)
    chamfer3_piece_12 = chamfer3_piece_12a & chamfer3_piece_12b
    add(chamfer3_piece_12, mode=Mode.SUBTRACT)
    with BuildSketch(Plane(origin=(4.25, 4.009518015, -4), x_dir=(1, 0, 0), z_dir=(0, 1, 0))) as chamfer3_piece_13a_section:
        Polygon((CHAMFER3_SIZE, 0), (0, -CHAMFER3_SIZE_2), (0, 0), align=None)
    chamfer3_piece_13a = extrude(amount=10.740481985, mode=Mode.PRIVATE)
    chamfer3_piece_13a = split(chamfer3_piece_13a, bisect_by=Plane(origin=(4.25, 6.25, -4), z_dir=(0, -1, 0)), keep=Keep.TOP, mode=Mode.PRIVATE)
    with BuildSketch(Plane(origin=(-4.25, 6.25, -4), x_dir=(0, -1, 0), z_dir=(1, 0, 0))) as chamfer3_piece_13b_section:
        Polygon((CHAMFER3_SIZE, 0), (0, -CHAMFER3_SIZE_2), (0, 0), align=None)
    chamfer3_piece_13b = extrude(amount=10.740481985, mode=Mode.PRIVATE)
    chamfer3_piece_13b = split(chamfer3_piece_13b, bisect_by=Plane(origin=(4.25, 6.25, -4), z_dir=(1, 0, 0)), keep=Keep.TOP, mode=Mode.PRIVATE)
    chamfer3_piece_13 = chamfer3_piece_13a & chamfer3_piece_13b
    add(chamfer3_piece_13, mode=Mode.SUBTRACT)

    # Sketch6 → Cut-Extrude3 (cut, through all)
    with BuildSketch(Plane.XZ.offset(-20.5)):
        Polygon((6.705369397, -4.4), (-5.305369397, -4.4), (-6.8, -9), (8.2, -9), align=None)
    extrude(amount=-CUT_EXTRUDE3_DEPTH, mode=Mode.SUBTRACT)

    # Fillet2
    fillet2_edges = [part.edges().sort_by_distance(p)[0] for p in [
        (0.7, 22.1, -4.4),
    ]]
    fillet(fillet2_edges, radius=FILLET2_R)

    # Sketch7 → AssyLock1 (add)
    with BuildSketch(Plane(origin=(0, 0, 0), x_dir=(0, 0, -1), z_dir=(1, 0, 0)).offset(ASSYLOCK1_START)):
        with BuildLine():
            Line((10, -12.5), (9, -12.5))
            ThreePointArc((9, -12.5), (6.5, -10), (9, -7.5))
            Line((9, -7.5), (10, -7.5))
            ThreePointArc((10, -7.5), (12.5, -10), (10, -12.5))
        make_face()
    extrude(amount=ASSYLOCK1_DEPTH)

    # Sketch7<2> → AssyLock2 (add)
    with BuildSketch(Plane(origin=(0, 0, 0), x_dir=(0, 0, -1), z_dir=(1, 0, 0)).offset(ASSYLOCK2_START)):
        with BuildLine():
            Line((10, -12.5), (9, -12.5))
            ThreePointArc((9, -12.5), (6.5, -10), (9, -7.5))
            Line((9, -7.5), (10, -7.5))
            ThreePointArc((10, -7.5), (12.5, -10), (10, -12.5))
        make_face()
    extrude(amount=ASSYLOCK2_DEPTH)

    # Sketch8 → Cut-Extrude4 (cut, two sides: drawn at the far end of the back side and taken through both)
    with BuildSketch(Plane(origin=(0, 0, 0), x_dir=(0, 0, -1), z_dir=(1, 0, 0)).offset(-CUT_EXTRUDE4_DEPTH_BACK)):
        with Locations((10, -10)):
            Circle(SKETCH8_R)
    extrude(amount=CUT_EXTRUDE4_DEPTH + CUT_EXTRUDE4_DEPTH_BACK, mode=Mode.SUBTRACT)

    # Sketch9 → Cut-Extrude5 (cut, through all)
    with BuildSketch(Plane(origin=(0, 0, 0), x_dir=(1, 0, 0), z_dir=(0, 1, 0))):
        Polygon((15.6, 9), (14.145115901, 12.5), (15.6, 12.5), align=None)
        Polygon((-15.6, 9), (-14.32610418, 12.5), (-15.6, 12.5), align=None)
    extrude(amount=-CUT_EXTRUDE5_DEPTH, mode=Mode.SUBTRACT)


solid = part.part
